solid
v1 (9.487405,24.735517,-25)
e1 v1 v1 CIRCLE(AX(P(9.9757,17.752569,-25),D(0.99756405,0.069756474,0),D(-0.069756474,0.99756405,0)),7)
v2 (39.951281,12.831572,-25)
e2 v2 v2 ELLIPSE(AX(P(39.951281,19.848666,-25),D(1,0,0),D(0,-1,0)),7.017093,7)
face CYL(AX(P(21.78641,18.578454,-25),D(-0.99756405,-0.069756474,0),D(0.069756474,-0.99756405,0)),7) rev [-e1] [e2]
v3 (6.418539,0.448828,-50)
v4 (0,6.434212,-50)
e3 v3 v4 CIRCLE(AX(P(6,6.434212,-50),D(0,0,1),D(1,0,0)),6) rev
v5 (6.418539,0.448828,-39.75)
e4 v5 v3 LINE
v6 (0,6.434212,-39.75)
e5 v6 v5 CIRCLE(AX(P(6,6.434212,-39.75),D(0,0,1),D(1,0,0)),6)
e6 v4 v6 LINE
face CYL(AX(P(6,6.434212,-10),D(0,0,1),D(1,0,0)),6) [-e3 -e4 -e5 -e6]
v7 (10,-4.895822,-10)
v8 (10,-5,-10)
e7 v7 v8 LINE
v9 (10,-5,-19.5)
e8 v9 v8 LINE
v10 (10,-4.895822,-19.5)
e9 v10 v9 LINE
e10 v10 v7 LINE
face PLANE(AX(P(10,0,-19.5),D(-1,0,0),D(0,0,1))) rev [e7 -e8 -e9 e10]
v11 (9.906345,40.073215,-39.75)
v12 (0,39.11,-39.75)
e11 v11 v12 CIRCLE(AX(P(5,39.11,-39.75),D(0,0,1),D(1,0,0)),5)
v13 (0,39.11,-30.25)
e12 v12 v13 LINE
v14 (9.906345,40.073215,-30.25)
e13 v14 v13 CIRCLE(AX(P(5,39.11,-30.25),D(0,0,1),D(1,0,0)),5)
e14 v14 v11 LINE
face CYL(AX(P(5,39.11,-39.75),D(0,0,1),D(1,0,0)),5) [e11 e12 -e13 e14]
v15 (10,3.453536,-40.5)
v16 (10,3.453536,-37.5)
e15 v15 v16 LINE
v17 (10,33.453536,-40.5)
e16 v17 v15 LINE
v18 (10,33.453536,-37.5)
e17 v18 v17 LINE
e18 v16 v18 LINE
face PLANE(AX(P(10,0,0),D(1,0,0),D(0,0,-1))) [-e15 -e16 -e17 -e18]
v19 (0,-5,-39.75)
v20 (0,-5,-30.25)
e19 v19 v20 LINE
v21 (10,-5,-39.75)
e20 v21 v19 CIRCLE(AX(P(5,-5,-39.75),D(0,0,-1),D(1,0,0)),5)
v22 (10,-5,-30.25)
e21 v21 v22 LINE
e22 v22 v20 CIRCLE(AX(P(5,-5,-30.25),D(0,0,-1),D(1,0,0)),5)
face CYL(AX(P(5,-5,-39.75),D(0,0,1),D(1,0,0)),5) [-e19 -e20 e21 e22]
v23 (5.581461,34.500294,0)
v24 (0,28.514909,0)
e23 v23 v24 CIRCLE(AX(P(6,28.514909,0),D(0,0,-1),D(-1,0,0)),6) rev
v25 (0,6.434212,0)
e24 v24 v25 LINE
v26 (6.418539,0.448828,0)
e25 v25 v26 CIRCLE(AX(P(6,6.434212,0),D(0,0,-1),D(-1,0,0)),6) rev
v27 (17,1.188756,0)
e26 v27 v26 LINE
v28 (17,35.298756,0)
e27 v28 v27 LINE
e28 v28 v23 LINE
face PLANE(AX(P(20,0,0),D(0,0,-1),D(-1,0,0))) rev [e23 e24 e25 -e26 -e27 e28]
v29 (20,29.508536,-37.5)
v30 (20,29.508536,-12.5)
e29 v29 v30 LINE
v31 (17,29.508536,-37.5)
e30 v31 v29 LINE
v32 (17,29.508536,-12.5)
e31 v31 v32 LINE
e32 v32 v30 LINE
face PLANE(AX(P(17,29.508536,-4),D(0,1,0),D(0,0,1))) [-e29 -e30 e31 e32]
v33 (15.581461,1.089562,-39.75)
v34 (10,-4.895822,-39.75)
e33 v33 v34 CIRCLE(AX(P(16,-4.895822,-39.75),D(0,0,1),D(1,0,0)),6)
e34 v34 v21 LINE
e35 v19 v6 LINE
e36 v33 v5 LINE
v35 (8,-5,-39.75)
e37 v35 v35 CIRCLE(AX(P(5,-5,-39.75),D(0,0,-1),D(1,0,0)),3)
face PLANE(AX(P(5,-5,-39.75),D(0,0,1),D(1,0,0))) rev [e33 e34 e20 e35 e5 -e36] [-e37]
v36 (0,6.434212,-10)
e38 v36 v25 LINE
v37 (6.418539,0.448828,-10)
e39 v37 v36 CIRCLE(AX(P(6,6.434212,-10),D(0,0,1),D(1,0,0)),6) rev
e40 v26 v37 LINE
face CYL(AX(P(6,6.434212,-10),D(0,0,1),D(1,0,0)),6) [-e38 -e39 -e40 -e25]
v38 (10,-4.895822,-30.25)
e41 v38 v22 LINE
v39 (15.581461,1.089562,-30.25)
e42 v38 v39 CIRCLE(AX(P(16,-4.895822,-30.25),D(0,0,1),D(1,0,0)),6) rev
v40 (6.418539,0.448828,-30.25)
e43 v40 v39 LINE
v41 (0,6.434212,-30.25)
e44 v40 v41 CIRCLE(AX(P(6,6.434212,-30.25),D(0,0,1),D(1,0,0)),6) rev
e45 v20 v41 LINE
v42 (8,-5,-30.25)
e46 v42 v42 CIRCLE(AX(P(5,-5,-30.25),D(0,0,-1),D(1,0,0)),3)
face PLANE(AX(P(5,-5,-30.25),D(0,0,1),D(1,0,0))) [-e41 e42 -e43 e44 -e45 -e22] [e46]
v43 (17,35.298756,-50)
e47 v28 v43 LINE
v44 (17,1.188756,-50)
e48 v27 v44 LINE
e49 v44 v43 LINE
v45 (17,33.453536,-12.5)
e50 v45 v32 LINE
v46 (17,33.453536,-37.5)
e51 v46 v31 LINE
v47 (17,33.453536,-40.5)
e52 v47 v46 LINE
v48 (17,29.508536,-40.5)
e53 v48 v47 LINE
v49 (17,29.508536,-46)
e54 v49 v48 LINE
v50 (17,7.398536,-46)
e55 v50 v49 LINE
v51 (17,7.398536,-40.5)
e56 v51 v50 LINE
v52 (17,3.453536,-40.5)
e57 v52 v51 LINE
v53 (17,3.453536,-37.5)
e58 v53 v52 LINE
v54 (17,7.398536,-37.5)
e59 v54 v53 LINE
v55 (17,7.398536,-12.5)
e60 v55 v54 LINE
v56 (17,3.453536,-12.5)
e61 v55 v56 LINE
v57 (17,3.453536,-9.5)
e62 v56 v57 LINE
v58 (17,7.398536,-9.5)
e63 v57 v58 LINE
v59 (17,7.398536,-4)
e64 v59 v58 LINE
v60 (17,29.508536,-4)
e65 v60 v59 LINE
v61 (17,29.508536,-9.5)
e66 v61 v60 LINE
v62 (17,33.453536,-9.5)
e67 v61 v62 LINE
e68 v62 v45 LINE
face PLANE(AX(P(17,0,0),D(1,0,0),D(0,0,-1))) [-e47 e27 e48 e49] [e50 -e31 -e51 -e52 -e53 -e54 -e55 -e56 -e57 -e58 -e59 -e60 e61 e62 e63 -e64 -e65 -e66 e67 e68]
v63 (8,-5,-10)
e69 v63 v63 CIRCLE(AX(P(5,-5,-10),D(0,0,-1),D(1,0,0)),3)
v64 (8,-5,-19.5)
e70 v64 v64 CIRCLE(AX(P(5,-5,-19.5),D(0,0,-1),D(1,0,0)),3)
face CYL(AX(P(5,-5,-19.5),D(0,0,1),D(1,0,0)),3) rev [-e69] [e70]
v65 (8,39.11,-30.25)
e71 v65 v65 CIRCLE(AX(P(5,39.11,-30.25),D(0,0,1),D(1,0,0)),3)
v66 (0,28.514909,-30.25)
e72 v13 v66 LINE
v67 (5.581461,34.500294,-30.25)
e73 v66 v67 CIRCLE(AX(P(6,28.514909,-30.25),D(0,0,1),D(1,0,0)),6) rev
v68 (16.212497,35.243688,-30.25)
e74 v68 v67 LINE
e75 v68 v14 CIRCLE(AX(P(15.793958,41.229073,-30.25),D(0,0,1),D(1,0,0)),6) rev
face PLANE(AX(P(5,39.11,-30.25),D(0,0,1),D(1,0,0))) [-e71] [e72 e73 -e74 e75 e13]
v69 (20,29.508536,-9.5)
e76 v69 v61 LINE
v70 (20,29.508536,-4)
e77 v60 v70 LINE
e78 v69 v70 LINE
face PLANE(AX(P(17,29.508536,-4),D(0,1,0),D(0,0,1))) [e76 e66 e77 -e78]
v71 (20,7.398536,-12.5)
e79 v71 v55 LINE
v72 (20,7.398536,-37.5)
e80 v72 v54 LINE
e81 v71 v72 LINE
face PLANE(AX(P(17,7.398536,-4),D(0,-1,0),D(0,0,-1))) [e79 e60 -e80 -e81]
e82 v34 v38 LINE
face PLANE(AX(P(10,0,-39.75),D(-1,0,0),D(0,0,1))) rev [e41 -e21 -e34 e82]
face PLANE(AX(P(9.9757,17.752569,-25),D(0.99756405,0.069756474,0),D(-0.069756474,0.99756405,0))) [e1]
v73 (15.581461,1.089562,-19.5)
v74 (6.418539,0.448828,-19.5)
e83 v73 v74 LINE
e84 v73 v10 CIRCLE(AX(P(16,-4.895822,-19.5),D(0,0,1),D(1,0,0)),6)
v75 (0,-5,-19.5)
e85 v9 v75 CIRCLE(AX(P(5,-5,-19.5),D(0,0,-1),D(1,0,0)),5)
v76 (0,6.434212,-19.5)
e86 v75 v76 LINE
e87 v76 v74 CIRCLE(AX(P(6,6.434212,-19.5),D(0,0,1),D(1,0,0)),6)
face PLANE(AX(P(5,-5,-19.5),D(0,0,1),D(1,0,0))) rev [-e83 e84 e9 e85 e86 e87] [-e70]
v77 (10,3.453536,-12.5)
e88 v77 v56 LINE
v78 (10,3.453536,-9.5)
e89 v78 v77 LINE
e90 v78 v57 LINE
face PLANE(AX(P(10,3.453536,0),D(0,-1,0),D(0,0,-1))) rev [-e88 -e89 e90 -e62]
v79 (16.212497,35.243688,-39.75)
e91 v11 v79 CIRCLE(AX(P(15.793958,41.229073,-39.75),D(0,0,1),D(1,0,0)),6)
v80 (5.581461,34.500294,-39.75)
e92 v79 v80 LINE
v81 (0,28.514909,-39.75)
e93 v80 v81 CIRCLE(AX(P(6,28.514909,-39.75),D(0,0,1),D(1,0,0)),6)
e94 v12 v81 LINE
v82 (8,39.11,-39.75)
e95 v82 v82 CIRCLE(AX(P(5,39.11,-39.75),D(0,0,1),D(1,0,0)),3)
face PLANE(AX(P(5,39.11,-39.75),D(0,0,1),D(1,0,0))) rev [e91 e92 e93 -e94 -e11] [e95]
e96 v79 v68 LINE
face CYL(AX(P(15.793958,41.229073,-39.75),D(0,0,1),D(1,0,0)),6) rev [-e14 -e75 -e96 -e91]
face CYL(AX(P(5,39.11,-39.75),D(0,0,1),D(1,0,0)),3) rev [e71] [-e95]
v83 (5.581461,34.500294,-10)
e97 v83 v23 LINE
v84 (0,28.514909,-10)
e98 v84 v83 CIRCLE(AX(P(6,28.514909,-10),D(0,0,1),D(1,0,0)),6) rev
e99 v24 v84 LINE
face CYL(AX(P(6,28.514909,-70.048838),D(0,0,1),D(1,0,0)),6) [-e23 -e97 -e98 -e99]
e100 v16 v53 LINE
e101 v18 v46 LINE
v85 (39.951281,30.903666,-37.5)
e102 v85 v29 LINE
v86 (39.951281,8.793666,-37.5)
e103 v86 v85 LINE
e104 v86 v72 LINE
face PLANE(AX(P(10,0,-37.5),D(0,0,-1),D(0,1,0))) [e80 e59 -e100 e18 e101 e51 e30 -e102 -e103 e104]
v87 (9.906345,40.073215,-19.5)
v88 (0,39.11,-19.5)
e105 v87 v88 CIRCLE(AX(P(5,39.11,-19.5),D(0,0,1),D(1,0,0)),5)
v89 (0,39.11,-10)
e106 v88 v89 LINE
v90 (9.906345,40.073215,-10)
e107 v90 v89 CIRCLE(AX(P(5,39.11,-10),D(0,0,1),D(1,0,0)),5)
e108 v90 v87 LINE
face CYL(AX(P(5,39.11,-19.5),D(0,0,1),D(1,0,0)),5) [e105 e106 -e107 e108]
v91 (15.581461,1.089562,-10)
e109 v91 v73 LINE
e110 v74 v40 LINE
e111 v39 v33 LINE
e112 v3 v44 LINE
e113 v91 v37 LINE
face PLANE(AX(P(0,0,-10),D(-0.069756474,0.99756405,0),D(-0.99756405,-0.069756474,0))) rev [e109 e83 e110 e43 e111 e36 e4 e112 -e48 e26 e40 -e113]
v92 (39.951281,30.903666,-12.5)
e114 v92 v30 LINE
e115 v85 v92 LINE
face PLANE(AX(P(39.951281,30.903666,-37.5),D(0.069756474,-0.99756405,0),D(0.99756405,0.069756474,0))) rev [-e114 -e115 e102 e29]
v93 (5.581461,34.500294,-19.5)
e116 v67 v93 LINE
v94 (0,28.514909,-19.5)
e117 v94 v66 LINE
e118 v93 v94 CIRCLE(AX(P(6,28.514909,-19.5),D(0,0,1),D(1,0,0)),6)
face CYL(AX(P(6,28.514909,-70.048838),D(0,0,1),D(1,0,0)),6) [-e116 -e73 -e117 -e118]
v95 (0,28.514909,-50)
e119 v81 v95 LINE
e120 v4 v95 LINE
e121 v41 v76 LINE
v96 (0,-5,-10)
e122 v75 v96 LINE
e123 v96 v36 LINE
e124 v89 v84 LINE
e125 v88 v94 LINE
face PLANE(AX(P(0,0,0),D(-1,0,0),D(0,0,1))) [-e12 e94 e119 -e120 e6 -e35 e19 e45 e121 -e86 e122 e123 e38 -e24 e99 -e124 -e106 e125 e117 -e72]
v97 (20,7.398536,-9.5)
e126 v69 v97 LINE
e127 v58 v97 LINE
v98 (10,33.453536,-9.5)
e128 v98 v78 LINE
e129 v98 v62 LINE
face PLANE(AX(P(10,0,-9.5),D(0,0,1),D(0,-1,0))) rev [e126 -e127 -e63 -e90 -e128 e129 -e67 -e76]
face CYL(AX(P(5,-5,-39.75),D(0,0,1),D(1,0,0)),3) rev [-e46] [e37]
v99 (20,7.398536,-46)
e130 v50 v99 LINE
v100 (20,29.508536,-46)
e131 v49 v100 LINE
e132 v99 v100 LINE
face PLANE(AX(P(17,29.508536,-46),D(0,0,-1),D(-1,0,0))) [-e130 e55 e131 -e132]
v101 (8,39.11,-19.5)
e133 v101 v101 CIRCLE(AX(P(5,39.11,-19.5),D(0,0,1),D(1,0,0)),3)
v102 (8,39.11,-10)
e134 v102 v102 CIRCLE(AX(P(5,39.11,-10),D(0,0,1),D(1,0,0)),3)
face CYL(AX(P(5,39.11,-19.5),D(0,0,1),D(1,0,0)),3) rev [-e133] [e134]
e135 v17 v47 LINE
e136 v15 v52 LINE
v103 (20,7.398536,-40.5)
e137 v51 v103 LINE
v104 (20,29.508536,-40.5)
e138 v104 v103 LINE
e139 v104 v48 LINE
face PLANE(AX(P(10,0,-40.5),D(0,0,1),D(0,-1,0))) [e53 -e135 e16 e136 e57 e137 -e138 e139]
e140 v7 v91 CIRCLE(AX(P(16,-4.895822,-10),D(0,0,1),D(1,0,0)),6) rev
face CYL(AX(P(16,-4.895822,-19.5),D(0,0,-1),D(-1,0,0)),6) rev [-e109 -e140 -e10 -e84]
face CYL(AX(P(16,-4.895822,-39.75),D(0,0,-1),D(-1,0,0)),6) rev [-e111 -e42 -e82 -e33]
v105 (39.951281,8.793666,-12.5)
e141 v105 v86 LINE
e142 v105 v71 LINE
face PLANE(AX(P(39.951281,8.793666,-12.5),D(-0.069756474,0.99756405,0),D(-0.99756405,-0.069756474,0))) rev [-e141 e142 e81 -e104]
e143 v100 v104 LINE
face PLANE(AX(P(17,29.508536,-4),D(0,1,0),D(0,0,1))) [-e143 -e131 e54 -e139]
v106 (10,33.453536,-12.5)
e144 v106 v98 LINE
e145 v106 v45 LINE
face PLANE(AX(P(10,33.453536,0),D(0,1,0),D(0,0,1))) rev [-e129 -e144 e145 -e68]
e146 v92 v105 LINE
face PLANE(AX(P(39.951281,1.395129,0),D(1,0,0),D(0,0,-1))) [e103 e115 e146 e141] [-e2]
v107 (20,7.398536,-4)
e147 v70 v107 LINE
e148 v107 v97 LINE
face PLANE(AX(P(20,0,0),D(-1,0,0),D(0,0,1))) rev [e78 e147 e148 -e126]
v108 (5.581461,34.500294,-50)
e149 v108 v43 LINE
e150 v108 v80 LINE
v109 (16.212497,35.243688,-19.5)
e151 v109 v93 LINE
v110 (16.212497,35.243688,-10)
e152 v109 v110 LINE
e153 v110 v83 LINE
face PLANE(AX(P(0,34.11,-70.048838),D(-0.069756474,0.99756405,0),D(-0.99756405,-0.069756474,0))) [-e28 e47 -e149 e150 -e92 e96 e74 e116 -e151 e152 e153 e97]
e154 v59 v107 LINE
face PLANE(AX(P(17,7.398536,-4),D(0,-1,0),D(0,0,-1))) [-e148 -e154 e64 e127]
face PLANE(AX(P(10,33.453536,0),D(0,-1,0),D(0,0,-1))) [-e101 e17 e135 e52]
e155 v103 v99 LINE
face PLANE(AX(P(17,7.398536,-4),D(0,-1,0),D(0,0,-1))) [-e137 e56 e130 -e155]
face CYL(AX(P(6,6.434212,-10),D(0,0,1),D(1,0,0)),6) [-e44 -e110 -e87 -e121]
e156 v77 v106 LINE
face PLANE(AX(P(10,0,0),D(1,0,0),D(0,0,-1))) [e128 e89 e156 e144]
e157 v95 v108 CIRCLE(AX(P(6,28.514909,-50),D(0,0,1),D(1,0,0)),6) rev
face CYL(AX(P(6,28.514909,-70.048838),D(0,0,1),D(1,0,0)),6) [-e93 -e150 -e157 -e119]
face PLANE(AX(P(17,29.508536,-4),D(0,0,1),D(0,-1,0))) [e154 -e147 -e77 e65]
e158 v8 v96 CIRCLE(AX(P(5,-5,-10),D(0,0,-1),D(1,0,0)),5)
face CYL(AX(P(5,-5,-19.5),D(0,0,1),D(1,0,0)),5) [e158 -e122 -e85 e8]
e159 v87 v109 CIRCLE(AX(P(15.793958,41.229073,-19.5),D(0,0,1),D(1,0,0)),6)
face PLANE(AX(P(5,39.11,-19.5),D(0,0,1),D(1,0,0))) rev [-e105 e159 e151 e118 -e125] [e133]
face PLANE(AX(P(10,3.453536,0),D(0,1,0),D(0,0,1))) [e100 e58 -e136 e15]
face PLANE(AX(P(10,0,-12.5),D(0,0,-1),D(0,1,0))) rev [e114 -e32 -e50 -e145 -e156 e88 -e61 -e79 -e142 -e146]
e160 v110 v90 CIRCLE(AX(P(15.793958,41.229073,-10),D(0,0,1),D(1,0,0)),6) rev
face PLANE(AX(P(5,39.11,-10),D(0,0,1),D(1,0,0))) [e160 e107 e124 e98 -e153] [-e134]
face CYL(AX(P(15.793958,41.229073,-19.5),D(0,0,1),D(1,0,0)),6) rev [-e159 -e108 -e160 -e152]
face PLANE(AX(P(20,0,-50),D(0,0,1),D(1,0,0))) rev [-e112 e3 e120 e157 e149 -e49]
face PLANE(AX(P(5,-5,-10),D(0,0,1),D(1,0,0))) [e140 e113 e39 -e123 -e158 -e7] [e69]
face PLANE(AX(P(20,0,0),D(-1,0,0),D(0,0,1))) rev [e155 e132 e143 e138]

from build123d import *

# Parameters (mm, degrees)
SKETCH1_W                      = 50
SKETCH1_H                      = 34.11
BOSS_EXTRUDE1_DEPTH            = 20
SKETCH3_R                      = 3
BOSS_EXTRUDE2_DEPTH            = 9.5
LPATTERN1_COUNT                = 2
LPATTERN1_PITCH                = 20.25
MIRROR1_COPY_1_SKETCH_R        = 3
MIRROR1_COPY_1_DEPTH           = 9.5
BOSS_EXTRUDE3_REACH            = 71.611
CUT_EXTRUDE3_DEPTH             = 10
CUT_EXTRUDE4_START             = -19.5
CUT_EXTRUDE4_DEPTH             = 10.75
CUT_EXTRUDE5_START             = -39.75
CUT_EXTRUDE5_DEPTH             = 10.25
CUT_EXTRUDE6_DEPTH             = 50
SKETCH6_W                      = 3
SKETCH6_H                      = 30
CUT_EXTRUDE2_DEPTH             = 10
SKETCH10_W                     = 50
SKETCH10_H                     = 34.11
SKETCH10_W_2                   = 42
SKETCH10_H_2                   = 22.11
CUT_EXTRUDE7_DEPTH             = 3
CUT_EXTRUDE8_REACH             = 70.733
SKETCH11_W                     = 3
SKETCH11_H                     = 50
FILLET1_R                      = 6
SKETCH5_R                      = 7
CUT_EXTRUDE1_DEPTH             = 10
CUT_EXTRUDE1_DIRECTION_2_REACH = 44.371
SKETCH13_W                     = 25
SKETCH13_H                     = 22.11
SKETCH13_RX                    = 7.017093287
SKETCH13_RY                    = 7
BOSS_EXTRUDE4_DEPTH            = 20


with BuildPart() as part:
    # Sketch1 → Boss-Extrude1 (new body)
    with BuildSketch(Plane(origin=(0, 0, 0), x_dir=(0, 0, -1), z_dir=(1, 0, 0))):
        with Locations((25, 17.055)):
            Rectangle(SKETCH1_W, SKETCH1_H)
    extrude(amount=BOSS_EXTRUDE1_DEPTH)

    # Sketch3 → Boss-Extrude2 (add)
    with BuildSketch(Plane.XY.offset(-10)):
        with BuildLine():
            Line((0, 34.11), (0, 39.11))
            ThreePointArc((0, 39.11), (5, 44.11), (10, 39.11))
            Line((10, 39.11), (10, 34.11))
            Line((10, 34.11), (5, 34.11))
            Line((5, 34.11), (0, 34.11))
        make_face()
        with Locations((5, 39.11)):
            Circle(SKETCH3_R, mode=Mode.SUBTRACT)
    boss_extrude2 = extrude(amount=-BOSS_EXTRUDE2_DEPTH)

    # LPattern1: Boss-Extrude2 ×2
    with Locations(*[(0, 0, -i * LPATTERN1_PITCH) for i in range(1, LPATTERN1_COUNT)]):
        add(boss_extrude2)

    # Mirror1: Boss-Extrude2 across plane
    add(boss_extrude2.mirror(Plane.ZX.offset(17.055)))

    # Mirror1 copy 1 sketch → Mirror1 copy 1 (add)
    with BuildSketch(Plane(origin=(0, 34.11, -30.25), x_dir=(1, 0, 0), z_dir=(0, 0, 1))):
        with BuildLine():
            Line((0, -34.11), (0, -39.11))
            ThreePointArc((0, -39.11), (5, -44.11), (10, -39.11))
            Line((10, -39.11), (10, -34.11))
            Line((10, -34.11), (5, -34.11))
            Line((5, -34.11), (0, -34.11))
        make_face()
        with Locations((5, -39.11)):
            Circle(MIRROR1_COPY_1_SKETCH_R, mode=Mode.SUBTRACT)
    extrude(amount=-MIRROR1_COPY_1_DEPTH)

    # Boss-Extrude3: up to this face of the body (flat: up to its plane)
    boss_extrude3_end = Plane(part.part.faces().sort_by_distance((10, 17.055, -50))[0])
    # Sketch7 → Boss-Extrude3 (add, up to the picked face)
    with BuildSketch(Plane.XY, mode=Mode.PRIVATE) as boss_extrude3_sk1:
        Polygon((20, 34.11), (0, 34.11), (20, 35.508536239), align=None)
    boss_extrude3_tool1 = split(extrude(boss_extrude3_sk1.sketch, amount=-BOSS_EXTRUDE3_REACH, mode=Mode.PRIVATE), bisect_by=boss_extrude3_end, keep=Keep.BOTH, mode=Mode.PRIVATE)
    add(boss_extrude3_tool1.solids().sort_by(Axis((13.333333, 34.576179, 0), (0, 0, -1)))[0])

    # Sketch8 → Cut-Extrude3 (cut)
    with BuildSketch(Plane.XY):
        Polygon((0, 0), (20, 1.398536239), (20, 0), align=None)
    extrude(amount=-CUT_EXTRUDE3_DEPTH, mode=Mode.SUBTRACT)

    # Sketch8<2> → Cut-Extrude4 (cut)
    with BuildSketch(Plane.XY.offset(CUT_EXTRUDE4_START)):
        Polygon((0, 0), (20, 1.398536239), (20, 0), align=None)
    extrude(amount=-CUT_EXTRUDE4_DEPTH, mode=Mode.SUBTRACT)

    # Sketch8<3> → Cut-Extrude5 (cut)
    with BuildSketch(Plane.XY.offset(CUT_EXTRUDE5_START)):
        Polygon((0, 0), (20, 1.398536239), (20, 0), align=None)
    extrude(amount=-CUT_EXTRUDE5_DEPTH, mode=Mode.SUBTRACT)

    # Sketch9 → Cut-Extrude6 (cut)
    with BuildSketch(Plane.XY):
        Polygon((20, 1.398536239), (10, 0.699268119), (10, 0), (20, 0), align=None)
    extrude(amount=-CUT_EXTRUDE6_DEPTH, mode=Mode.SUBTRACT)

    # Sketch6 → Cut-Extrude2 (cut)
    with BuildSketch(Plane(origin=(20, 0, 0), x_dir=(0, 0, -1), z_dir=(1, 0, 0))):
        with Locations((11, 18.453536239)):
            Rectangle(SKETCH6_W, SKETCH6_H)
        with Locations((39, 18.453536239)):
            Rectangle(SKETCH6_W, SKETCH6_H)
    extrude(amount=-CUT_EXTRUDE2_DEPTH, mode=Mode.SUBTRACT)

    # Sketch10 → Cut-Extrude7 (cut)
    with BuildSketch(Plane(origin=(20, 0, 0), x_dir=(0, 0, -1), z_dir=(1, 0, 0))):
        with Locations((25, 18.453536239)):
            Rectangle(SKETCH10_W, SKETCH10_H)
        with Locations((25, 18.453536239)):
            Rectangle(SKETCH10_W_2, SKETCH10_H_2, mode=Mode.SUBTRACT)
    extrude(amount=-CUT_EXTRUDE7_DEPTH, mode=Mode.SUBTRACT)

    # Cut-Extrude8: up to this face of the body (flat: up to its plane)
    cut_extrude8_end = Plane(part.part.faces().sort_by_distance((11.172839506, 0.781281047, -25.029320988))[0])
    # Sketch11 → Cut-Extrude8 (cut, up to the picked face)
    with BuildSketch(Plane(origin=(0, 1.398536239, 0), x_dir=(1, 0, 0), z_dir=(0, 1, 0)), mode=Mode.PRIVATE) as cut_extrude8_sk1:
        with Locations((18.5, 25)):
            Rectangle(SKETCH11_W, SKETCH11_H)
    cut_extrude8_tool1 = split(extrude(cut_extrude8_sk1.sketch, amount=-CUT_EXTRUDE8_REACH, mode=Mode.PRIVATE), bisect_by=cut_extrude8_end, keep=Keep.BOTH, mode=Mode.PRIVATE)
    add(cut_extrude8_tool1.solids().sort_by(Axis((18.5, 1.398536, -25), (0, -1, 0)))[0], mode=Mode.SUBTRACT)

    # Fillet1
    # the kernel refuses this fillet: 6 mm, written as the material it adds along each edge
    with BuildSketch(Plane(origin=(10, 0.699268119, -10), x_dir=(0, -1, 0), z_dir=(0, 0, -1)), Plane(origin=(10, 0.699268119, -30.25), x_dir=(0, -1, 0), z_dir=(0, 0, -1))) as fillet1_piece_1:
        with BuildLine():
            CenterArc((FILLET1_R * 0.932515086138, -FILLET1_R), FILLET1_R, 90, 86)
            Line((-FILLET1_R * 0.0650489641222, -FILLET1_R * 0.930243526256), (0, 0))
            Line((0, 0), (FILLET1_R * 0.932515086138, 0))
        make_face()
    extrude(amount=9.5)
    with BuildSketch(Plane(origin=(10, 0.699268119, -10), x_dir=(0, -1, 0), z_dir=(0, 0, -1))) as fillet1_piece_2_section:
        with BuildLine():
            CenterArc((FILLET1_R * 0.932515086138, -FILLET1_R), FILLET1_R, 90, 86)
            Line((-FILLET1_R * 0.0650489641222, -FILLET1_R * 0.930243526256), (0, 0))
            Line((0, 0), (FILLET1_R * 0.932515086138, 0))
        make_face()
    fillet1_piece_2 = extrude(amount=23.487726292, mode=Mode.PRIVATE)
    fillet1_piece_2 = split(fillet1_piece_2, bisect_by=Plane(origin=(11.254012423, -0.470117383, -30.25), z_dir=(0, 0, -1)), keep=Keep.TOP, mode=Mode.PRIVATE)
    add(fillet1_piece_2)
    with BuildSketch(Plane(origin=(10, 0.699268119, -16.262273708), x_dir=(0, -1, 0), z_dir=(0, 0, -1))) as fillet1_piece_3_section:
        with BuildLine():
            CenterArc((FILLET1_R * 0.932515086138, -FILLET1_R), FILLET1_R, 90, 86)
            Line((-FILLET1_R * 0.0650489641222, -FILLET1_R * 0.930243526256), (0, 0))
            Line((0, 0), (FILLET1_R * 0.932515086138, 0))
        make_face()
    fillet1_piece_3 = extrude(amount=23.487726292, mode=Mode.PRIVATE)
    fillet1_piece_3 = split(fillet1_piece_3, bisect_by=Plane(origin=(11.254012423, -0.470117383, -19.5), z_dir=(0, 0, 1)), keep=Keep.TOP, mode=Mode.PRIVATE)
    add(fillet1_piece_3)
    with BuildSketch(Plane(origin=(10, 34.809268119, -39.75), x_dir=(-0.017789045338557734, 0.9998417624134045, 0), z_dir=(0, 0, 1)), Plane(origin=(10, 34.809268119, -19.5), x_dir=(-0.017789045338557734, 0.9998417624134045, 0), z_dir=(0, 0, 1))) as fillet1_piece_4:
        with BuildLine():
            CenterArc((6.31571957, -5.907243477), FILLET1_R, 100.087773501, 82.892935515)
            Line((0.323836974, -6.219241818), (-0.275351285, -6.250441652))
            Line((-0.275351285, -6.250441652), (-0.59918826, -0.031199834))
            Line((-0.59918826, -0.031199834), (0.010673427, 0.599905057))
            ThreePointArc((0.010673427, 0.599905057), (4.31072477, 0.523399143), (5.15968577, 0.590724348))
            Line((5.15968577, 0.590724348), (5.264779752, 0))
        make_face()
    extrude(amount=9.5)
    with BuildSketch(Plane(origin=(10, 34.809268119, -39.75), x_dir=(-0.017789045338557734, 0.9998417624134045, 0), z_dir=(0, 0, 1))) as fillet1_piece_5_section:
        with BuildLine():
            CenterArc((6.31571957, -5.907243477), FILLET1_R, 100.087773501, 82.892935515)
            Line((0.323836974, -6.219241818), (-0.275351285, -6.250441652))
            Line((-0.275351285, -6.250441652), (-0.59918826, -0.031199834))
            Line((-0.59918826, -0.031199834), (0.010673427, 0.599905057))
            ThreePointArc((0.010673427, 0.599905057), (4.31072477, 0.523399143), (5.15968577, 0.590724348))
            Line((5.15968577, 0.590724348), (5.264779752, 0))
        make_face()
    fillet1_piece_5 = extrude(amount=25.069168086, mode=Mode.PRIVATE)
    fillet1_piece_5 = split(fillet1_piece_5, bisect_by=Plane(origin=(11.504368247, 36.050278399, -19.5), z_dir=(0, 0, 1)), keep=Keep.TOP, mode=Mode.PRIVATE)
    add(fillet1_piece_5)
    with BuildSketch(Plane(origin=(10, 34.809268119, -35.069168086), x_dir=(-0.017789045338557734, 0.9998417624134045, 0), z_dir=(0, 0, 1))) as fillet1_piece_6_section:
        with BuildLine():
            CenterArc((6.31571957, -5.907243477), FILLET1_R, 100.087773501, 82.892935515)
            Line((0.323836974, -6.219241818), (-0.275351285, -6.250441652))
            Line((-0.275351285, -6.250441652), (-0.59918826, -0.031199834))
            Line((-0.59918826, -0.031199834), (0.010673427, 0.599905057))
            ThreePointArc((0.010673427, 0.599905057), (4.31072477, 0.523399143), (5.15968577, 0.590724348))
            Line((5.15968577, 0.590724348), (5.264779752, 0))
        make_face()
    fillet1_piece_6 = extrude(amount=25.069168086, mode=Mode.PRIVATE)
    fillet1_piece_6 = split(fillet1_piece_6, bisect_by=Plane(origin=(11.504368247, 36.050278399, -30.25), z_dir=(0, 0, -1)), keep=Keep.TOP, mode=Mode.PRIVATE)
    add(fillet1_piece_6)
    # the kernel refuses this fillet: 6 mm, written as the material it takes off along each edge
    with BuildSketch(Plane(origin=(0, 0, 16.08553065), x_dir=(0, 1, 0), z_dir=(0, 0, -1))) as fillet1_2_piece_1:
        with BuildLine():
            CenterArc((FILLET1_R * 1.07236871002, FILLET1_R), FILLET1_R, 176, 94)
            Line((FILLET1_R * 0.0748046597649, FILLET1_R * 1.06975647374), (0, 0))
            Line((0, 0), (FILLET1_R * 1.07236871002, 0))
        make_face()
    extrude(amount=26.08553065, mode=Mode.SUBTRACT)
    with BuildSketch(Plane(origin=(0, 0, 16.08553065), x_dir=(0, 1, 0), z_dir=(0, 0, -1))) as fillet1_2_piece_2_section:
        with BuildLine():
            CenterArc((FILLET1_R * 1.07236871002, FILLET1_R), FILLET1_R, 176, 94)
            Line((FILLET1_R * 0.0748046597649, FILLET1_R * 1.06975647374), (0, 0))
            Line((0, 0), (FILLET1_R * 1.07236871002, 0))
        make_face()
    fillet1_2_piece_2 = extrude(amount=42.171061301, mode=Mode.PRIVATE)
    fillet1_2_piece_2 = split(fillet1_2_piece_2, bisect_by=Plane(origin=(1.465256167, 1.571294865, -19.5), z_dir=(0, 0, -1)), keep=Keep.TOP, mode=Mode.PRIVATE)
    add(fillet1_2_piece_2, mode=Mode.SUBTRACT)
    with BuildSketch(Plane(origin=(0, 0, -3.41446935), x_dir=(0, 1, 0), z_dir=(0, 0, -1))) as fillet1_2_piece_3_section:
        with BuildLine():
            CenterArc((FILLET1_R * 1.07236871002, FILLET1_R), FILLET1_R, 176, 94)
            Line((FILLET1_R * 0.0748046597649, FILLET1_R * 1.06975647374), (0, 0))
            Line((0, 0), (FILLET1_R * 1.07236871002, 0))
        make_face()
    fillet1_2_piece_3 = extrude(amount=26.83553065, mode=Mode.PRIVATE)
    fillet1_2_piece_3 = split(fillet1_2_piece_3, bisect_by=Plane(origin=(1.465256167, 1.571294865, -10), z_dir=(0, 0, 1)), keep=Keep.TOP, mode=Mode.PRIVATE)
    add(fillet1_2_piece_3, mode=Mode.SUBTRACT)
    with BuildSketch(Plane(origin=(0, 0, -19.5), x_dir=(0, 1, 0), z_dir=(0, 0, -1))) as fillet1_2_piece_4:
        with BuildLine():
            CenterArc((FILLET1_R * 1.07236871002, FILLET1_R), FILLET1_R, 176, 94)
            Line((FILLET1_R * 0.0748046597649, FILLET1_R * 1.06975647374), (0, 0))
            Line((0, 0), (FILLET1_R * 1.07236871002, 0))
        make_face()
    extrude(amount=10.75, mode=Mode.SUBTRACT)
    with BuildSketch(Plane(origin=(0, 0, -19.5), x_dir=(0, 1, 0), z_dir=(0, 0, -1))) as fillet1_2_piece_5_section:
        with BuildLine():
            CenterArc((FILLET1_R * 1.07236871002, FILLET1_R), FILLET1_R, 176, 94)
            Line((FILLET1_R * 0.0748046597649, FILLET1_R * 1.06975647374), (0, 0))
            Line((0, 0), (FILLET1_R * 1.07236871002, 0))
        make_face()
    fillet1_2_piece_5 = extrude(amount=26.83553065, mode=Mode.PRIVATE)
    fillet1_2_piece_5 = split(fillet1_2_piece_5, bisect_by=Plane(origin=(1.465256167, 1.571294865, -39.75), z_dir=(0, 0, -1)), keep=Keep.TOP, mode=Mode.PRIVATE)
    add(fillet1_2_piece_5, mode=Mode.SUBTRACT)
    with BuildSketch(Plane(origin=(0, 0, -23.66446935), x_dir=(0, 1, 0), z_dir=(0, 0, -1))) as fillet1_2_piece_6_section:
        with BuildLine():
            CenterArc((FILLET1_R * 1.07236871002, FILLET1_R), FILLET1_R, 176, 94)
            Line((FILLET1_R * 0.0748046597649, FILLET1_R * 1.06975647374), (0, 0))
            Line((0, 0), (FILLET1_R * 1.07236871002, 0))
        make_face()
    fillet1_2_piece_6 = extrude(amount=42.421061301, mode=Mode.PRIVATE)
    fillet1_2_piece_6 = split(fillet1_2_piece_6, bisect_by=Plane(origin=(1.465256167, 1.571294865, -30.25), z_dir=(0, 0, 1)), keep=Keep.TOP, mode=Mode.PRIVATE)
    add(fillet1_2_piece_6, mode=Mode.SUBTRACT)
    with BuildSketch(Plane(origin=(0, 0, -39.75), x_dir=(0, 1, 0), z_dir=(0, 0, -1))) as fillet1_2_piece_7:
        with BuildLine():
            CenterArc((FILLET1_R * 1.07236871002, FILLET1_R), FILLET1_R, 176, 94)
            Line((FILLET1_R * 0.0748046597649, FILLET1_R * 1.06975647374), (0, 0))
            Line((0, 0), (FILLET1_R * 1.07236871002, 0))
        make_face()
    extrude(amount=26.33553065, mode=Mode.SUBTRACT)
    with BuildSketch(Plane(origin=(0, 34.11, -63.987726292), x_dir=(0, -1, 0), z_dir=(0, 0, 1))) as fillet1_2_piece_8:
        with BuildLine():
            CenterArc((FILLET1_R * 0.932515086138, FILLET1_R), FILLET1_R, 184, 86)
            Line((-FILLET1_R * 0.0650489641222, FILLET1_R * 0.930243526256), (0, 0))
            Line((0, 0), (FILLET1_R * 0.932515086138, 0))
        make_face()
    extrude(amount=24.237726292, mode=Mode.SUBTRACT)
    with BuildSketch(Plane(origin=(0, 34.11, -63.987726292), x_dir=(0, -1, 0), z_dir=(0, 0, 1))) as fillet1_2_piece_9_section:
        with BuildLine():
            CenterArc((FILLET1_R * 0.932515086138, FILLET1_R), FILLET1_R, 184, 86)
            Line((-FILLET1_R * 0.0650489641222, FILLET1_R * 0.930243526256), (0, 0))
            Line((0, 0), (FILLET1_R * 0.932515086138, 0))
        make_face()
    fillet1_2_piece_9 = extrude(amount=38.225452584, mode=Mode.PRIVATE)
    fillet1_2_piece_9 = split(fillet1_2_piece_9, bisect_by=Plane(origin=(1.254012423, 32.940614497, -30.25), z_dir=(0, 0, 1)), keep=Keep.TOP, mode=Mode.PRIVATE)
    add(fillet1_2_piece_9, mode=Mode.SUBTRACT)
    with BuildSketch(Plane(origin=(0, 34.11, -44.237726292), x_dir=(0, -1, 0), z_dir=(0, 0, 1))) as fillet1_2_piece_10_section:
        with BuildLine():
            CenterArc((FILLET1_R * 0.932515086138, FILLET1_R), FILLET1_R, 184, 86)
            Line((-FILLET1_R * 0.0650489641222, FILLET1_R * 0.930243526256), (0, 0))
            Line((0, 0), (FILLET1_R * 0.932515086138, 0))
        make_face()
    fillet1_2_piece_10 = extrude(amount=24.737726292, mode=Mode.PRIVATE)
    fillet1_2_piece_10 = split(fillet1_2_piece_10, bisect_by=Plane(origin=(1.254012423, 32.940614497, -39.75), z_dir=(0, 0, -1)), keep=Keep.TOP, mode=Mode.PRIVATE)
    add(fillet1_2_piece_10, mode=Mode.SUBTRACT)
    with BuildSketch(Plane(origin=(0, 34.11, -30.25), x_dir=(0, -1, 0), z_dir=(0, 0, 1))) as fillet1_2_piece_11:
        with BuildLine():
            CenterArc((FILLET1_R * 0.932515086138, FILLET1_R), FILLET1_R, 184, 86)
            Line((-FILLET1_R * 0.0650489641222, FILLET1_R * 0.930243526256), (0, 0))
            Line((0, 0), (FILLET1_R * 0.932515086138, 0))
        make_face()
    extrude(amount=10.75, mode=Mode.SUBTRACT)
    with BuildSketch(Plane(origin=(0, 34.11, -30.25), x_dir=(0, -1, 0), z_dir=(0, 0, 1))) as fillet1_2_piece_12_section:
        with BuildLine():
            CenterArc((FILLET1_R * 0.932515086138, FILLET1_R), FILLET1_R, 184, 86)
            Line((-FILLET1_R * 0.0650489641222, FILLET1_R * 0.930243526256), (0, 0))
            Line((0, 0), (FILLET1_R * 0.932515086138, 0))
        make_face()
    fillet1_2_piece_12 = extrude(amount=24.737726292, mode=Mode.PRIVATE)
    fillet1_2_piece_12 = split(fillet1_2_piece_12, bisect_by=Plane(origin=(1.254012423, 32.940614497, -10), z_dir=(0, 0, 1)), keep=Keep.TOP, mode=Mode.PRIVATE)
    add(fillet1_2_piece_12, mode=Mode.SUBTRACT)
    with BuildSketch(Plane(origin=(0, 34.11, -23.987726292), x_dir=(0, -1, 0), z_dir=(0, 0, 1))) as fillet1_2_piece_13_section:
        with BuildLine():
            CenterArc((FILLET1_R * 0.932515086138, FILLET1_R), FILLET1_R, 184, 86)
            Line((-FILLET1_R * 0.0650489641222, FILLET1_R * 0.930243526256), (0, 0))
            Line((0, 0), (FILLET1_R * 0.932515086138, 0))
        make_face()
    fillet1_2_piece_13 = extrude(amount=37.975452584, mode=Mode.PRIVATE)
    fillet1_2_piece_13 = split(fillet1_2_piece_13, bisect_by=Plane(origin=(1.254012423, 32.940614497, -19.5), z_dir=(0, 0, -1)), keep=Keep.TOP, mode=Mode.PRIVATE)
    add(fillet1_2_piece_13, mode=Mode.SUBTRACT)
    with BuildSketch(Plane(origin=(0, 34.11, -10), x_dir=(0, -1, 0), z_dir=(0, 0, 1))) as fillet1_2_piece_14:
        with BuildLine():
            CenterArc((FILLET1_R * 0.932515086138, FILLET1_R), FILLET1_R, 184, 86)
            Line((-FILLET1_R * 0.0650489641222, FILLET1_R * 0.930243526256), (0, 0))
            Line((0, 0), (FILLET1_R * 0.932515086138, 0))
        make_face()
    extrude(amount=23.987726292, mode=Mode.SUBTRACT)

    # Sketch5 → Cut-Extrude1 (cut)
    with BuildSketch(Plane(origin=(20, 17.754268119, -25), x_dir=(0, 0, -1), z_dir=(0.9975640502598249, 0.06975647374411839, 0))):
        with Locations(Location((0, 0.697564737, 0), (0, 0, 270))):
            Circle(SKETCH5_R)
    extrude(amount=-CUT_EXTRUDE1_DEPTH, mode=Mode.SUBTRACT)

    # Sketch5 → Cut-Extrude1 direction 2 (cut, up to next)
    with BuildSketch(Plane(origin=(20, 17.754268119, -25), x_dir=(0, 0, -1), z_dir=(0.9975640502598249, 0.06975647374411839, 0)), mode=Mode.PRIVATE) as cut_extrude1_direction_2_sk1:
        with Locations(Location((0, 0.697564737, 0), (0, 0, 270))):
            Circle(SKETCH5_R)
    cut_extrude1_direction_2_tool1 = extrude(cut_extrude1_direction_2_sk1.sketch, amount=CUT_EXTRUDE1_DIRECTION_2_REACH, mode=Mode.PRIVATE) & part.part
    add(cut_extrude1_direction_2_tool1.solids().sort_by_distance((19.95134, 18.450134, -25))[0], mode=Mode.SUBTRACT)

    # Sketch13 → Boss-Extrude4 (add, along a direction that is not the sketch's normal)
    with BuildSketch(Plane(origin=(20, 0, 0), x_dir=(0, 0, -1), z_dir=(1, 0, 0))):
        with Locations((25, 18.453536239)):
            Rectangle(SKETCH13_W, SKETCH13_H)
        with Locations(Location((25, 18.453536239), (0, 0, -90))):
            Ellipse(SKETCH13_RX, SKETCH13_RY, mode=Mode.SUBTRACT)
    extrude(amount=BOSS_EXTRUDE4_DEPTH, dir=(0.9975640502598249, 0.0697564737441187, 0))


solid = part.part
